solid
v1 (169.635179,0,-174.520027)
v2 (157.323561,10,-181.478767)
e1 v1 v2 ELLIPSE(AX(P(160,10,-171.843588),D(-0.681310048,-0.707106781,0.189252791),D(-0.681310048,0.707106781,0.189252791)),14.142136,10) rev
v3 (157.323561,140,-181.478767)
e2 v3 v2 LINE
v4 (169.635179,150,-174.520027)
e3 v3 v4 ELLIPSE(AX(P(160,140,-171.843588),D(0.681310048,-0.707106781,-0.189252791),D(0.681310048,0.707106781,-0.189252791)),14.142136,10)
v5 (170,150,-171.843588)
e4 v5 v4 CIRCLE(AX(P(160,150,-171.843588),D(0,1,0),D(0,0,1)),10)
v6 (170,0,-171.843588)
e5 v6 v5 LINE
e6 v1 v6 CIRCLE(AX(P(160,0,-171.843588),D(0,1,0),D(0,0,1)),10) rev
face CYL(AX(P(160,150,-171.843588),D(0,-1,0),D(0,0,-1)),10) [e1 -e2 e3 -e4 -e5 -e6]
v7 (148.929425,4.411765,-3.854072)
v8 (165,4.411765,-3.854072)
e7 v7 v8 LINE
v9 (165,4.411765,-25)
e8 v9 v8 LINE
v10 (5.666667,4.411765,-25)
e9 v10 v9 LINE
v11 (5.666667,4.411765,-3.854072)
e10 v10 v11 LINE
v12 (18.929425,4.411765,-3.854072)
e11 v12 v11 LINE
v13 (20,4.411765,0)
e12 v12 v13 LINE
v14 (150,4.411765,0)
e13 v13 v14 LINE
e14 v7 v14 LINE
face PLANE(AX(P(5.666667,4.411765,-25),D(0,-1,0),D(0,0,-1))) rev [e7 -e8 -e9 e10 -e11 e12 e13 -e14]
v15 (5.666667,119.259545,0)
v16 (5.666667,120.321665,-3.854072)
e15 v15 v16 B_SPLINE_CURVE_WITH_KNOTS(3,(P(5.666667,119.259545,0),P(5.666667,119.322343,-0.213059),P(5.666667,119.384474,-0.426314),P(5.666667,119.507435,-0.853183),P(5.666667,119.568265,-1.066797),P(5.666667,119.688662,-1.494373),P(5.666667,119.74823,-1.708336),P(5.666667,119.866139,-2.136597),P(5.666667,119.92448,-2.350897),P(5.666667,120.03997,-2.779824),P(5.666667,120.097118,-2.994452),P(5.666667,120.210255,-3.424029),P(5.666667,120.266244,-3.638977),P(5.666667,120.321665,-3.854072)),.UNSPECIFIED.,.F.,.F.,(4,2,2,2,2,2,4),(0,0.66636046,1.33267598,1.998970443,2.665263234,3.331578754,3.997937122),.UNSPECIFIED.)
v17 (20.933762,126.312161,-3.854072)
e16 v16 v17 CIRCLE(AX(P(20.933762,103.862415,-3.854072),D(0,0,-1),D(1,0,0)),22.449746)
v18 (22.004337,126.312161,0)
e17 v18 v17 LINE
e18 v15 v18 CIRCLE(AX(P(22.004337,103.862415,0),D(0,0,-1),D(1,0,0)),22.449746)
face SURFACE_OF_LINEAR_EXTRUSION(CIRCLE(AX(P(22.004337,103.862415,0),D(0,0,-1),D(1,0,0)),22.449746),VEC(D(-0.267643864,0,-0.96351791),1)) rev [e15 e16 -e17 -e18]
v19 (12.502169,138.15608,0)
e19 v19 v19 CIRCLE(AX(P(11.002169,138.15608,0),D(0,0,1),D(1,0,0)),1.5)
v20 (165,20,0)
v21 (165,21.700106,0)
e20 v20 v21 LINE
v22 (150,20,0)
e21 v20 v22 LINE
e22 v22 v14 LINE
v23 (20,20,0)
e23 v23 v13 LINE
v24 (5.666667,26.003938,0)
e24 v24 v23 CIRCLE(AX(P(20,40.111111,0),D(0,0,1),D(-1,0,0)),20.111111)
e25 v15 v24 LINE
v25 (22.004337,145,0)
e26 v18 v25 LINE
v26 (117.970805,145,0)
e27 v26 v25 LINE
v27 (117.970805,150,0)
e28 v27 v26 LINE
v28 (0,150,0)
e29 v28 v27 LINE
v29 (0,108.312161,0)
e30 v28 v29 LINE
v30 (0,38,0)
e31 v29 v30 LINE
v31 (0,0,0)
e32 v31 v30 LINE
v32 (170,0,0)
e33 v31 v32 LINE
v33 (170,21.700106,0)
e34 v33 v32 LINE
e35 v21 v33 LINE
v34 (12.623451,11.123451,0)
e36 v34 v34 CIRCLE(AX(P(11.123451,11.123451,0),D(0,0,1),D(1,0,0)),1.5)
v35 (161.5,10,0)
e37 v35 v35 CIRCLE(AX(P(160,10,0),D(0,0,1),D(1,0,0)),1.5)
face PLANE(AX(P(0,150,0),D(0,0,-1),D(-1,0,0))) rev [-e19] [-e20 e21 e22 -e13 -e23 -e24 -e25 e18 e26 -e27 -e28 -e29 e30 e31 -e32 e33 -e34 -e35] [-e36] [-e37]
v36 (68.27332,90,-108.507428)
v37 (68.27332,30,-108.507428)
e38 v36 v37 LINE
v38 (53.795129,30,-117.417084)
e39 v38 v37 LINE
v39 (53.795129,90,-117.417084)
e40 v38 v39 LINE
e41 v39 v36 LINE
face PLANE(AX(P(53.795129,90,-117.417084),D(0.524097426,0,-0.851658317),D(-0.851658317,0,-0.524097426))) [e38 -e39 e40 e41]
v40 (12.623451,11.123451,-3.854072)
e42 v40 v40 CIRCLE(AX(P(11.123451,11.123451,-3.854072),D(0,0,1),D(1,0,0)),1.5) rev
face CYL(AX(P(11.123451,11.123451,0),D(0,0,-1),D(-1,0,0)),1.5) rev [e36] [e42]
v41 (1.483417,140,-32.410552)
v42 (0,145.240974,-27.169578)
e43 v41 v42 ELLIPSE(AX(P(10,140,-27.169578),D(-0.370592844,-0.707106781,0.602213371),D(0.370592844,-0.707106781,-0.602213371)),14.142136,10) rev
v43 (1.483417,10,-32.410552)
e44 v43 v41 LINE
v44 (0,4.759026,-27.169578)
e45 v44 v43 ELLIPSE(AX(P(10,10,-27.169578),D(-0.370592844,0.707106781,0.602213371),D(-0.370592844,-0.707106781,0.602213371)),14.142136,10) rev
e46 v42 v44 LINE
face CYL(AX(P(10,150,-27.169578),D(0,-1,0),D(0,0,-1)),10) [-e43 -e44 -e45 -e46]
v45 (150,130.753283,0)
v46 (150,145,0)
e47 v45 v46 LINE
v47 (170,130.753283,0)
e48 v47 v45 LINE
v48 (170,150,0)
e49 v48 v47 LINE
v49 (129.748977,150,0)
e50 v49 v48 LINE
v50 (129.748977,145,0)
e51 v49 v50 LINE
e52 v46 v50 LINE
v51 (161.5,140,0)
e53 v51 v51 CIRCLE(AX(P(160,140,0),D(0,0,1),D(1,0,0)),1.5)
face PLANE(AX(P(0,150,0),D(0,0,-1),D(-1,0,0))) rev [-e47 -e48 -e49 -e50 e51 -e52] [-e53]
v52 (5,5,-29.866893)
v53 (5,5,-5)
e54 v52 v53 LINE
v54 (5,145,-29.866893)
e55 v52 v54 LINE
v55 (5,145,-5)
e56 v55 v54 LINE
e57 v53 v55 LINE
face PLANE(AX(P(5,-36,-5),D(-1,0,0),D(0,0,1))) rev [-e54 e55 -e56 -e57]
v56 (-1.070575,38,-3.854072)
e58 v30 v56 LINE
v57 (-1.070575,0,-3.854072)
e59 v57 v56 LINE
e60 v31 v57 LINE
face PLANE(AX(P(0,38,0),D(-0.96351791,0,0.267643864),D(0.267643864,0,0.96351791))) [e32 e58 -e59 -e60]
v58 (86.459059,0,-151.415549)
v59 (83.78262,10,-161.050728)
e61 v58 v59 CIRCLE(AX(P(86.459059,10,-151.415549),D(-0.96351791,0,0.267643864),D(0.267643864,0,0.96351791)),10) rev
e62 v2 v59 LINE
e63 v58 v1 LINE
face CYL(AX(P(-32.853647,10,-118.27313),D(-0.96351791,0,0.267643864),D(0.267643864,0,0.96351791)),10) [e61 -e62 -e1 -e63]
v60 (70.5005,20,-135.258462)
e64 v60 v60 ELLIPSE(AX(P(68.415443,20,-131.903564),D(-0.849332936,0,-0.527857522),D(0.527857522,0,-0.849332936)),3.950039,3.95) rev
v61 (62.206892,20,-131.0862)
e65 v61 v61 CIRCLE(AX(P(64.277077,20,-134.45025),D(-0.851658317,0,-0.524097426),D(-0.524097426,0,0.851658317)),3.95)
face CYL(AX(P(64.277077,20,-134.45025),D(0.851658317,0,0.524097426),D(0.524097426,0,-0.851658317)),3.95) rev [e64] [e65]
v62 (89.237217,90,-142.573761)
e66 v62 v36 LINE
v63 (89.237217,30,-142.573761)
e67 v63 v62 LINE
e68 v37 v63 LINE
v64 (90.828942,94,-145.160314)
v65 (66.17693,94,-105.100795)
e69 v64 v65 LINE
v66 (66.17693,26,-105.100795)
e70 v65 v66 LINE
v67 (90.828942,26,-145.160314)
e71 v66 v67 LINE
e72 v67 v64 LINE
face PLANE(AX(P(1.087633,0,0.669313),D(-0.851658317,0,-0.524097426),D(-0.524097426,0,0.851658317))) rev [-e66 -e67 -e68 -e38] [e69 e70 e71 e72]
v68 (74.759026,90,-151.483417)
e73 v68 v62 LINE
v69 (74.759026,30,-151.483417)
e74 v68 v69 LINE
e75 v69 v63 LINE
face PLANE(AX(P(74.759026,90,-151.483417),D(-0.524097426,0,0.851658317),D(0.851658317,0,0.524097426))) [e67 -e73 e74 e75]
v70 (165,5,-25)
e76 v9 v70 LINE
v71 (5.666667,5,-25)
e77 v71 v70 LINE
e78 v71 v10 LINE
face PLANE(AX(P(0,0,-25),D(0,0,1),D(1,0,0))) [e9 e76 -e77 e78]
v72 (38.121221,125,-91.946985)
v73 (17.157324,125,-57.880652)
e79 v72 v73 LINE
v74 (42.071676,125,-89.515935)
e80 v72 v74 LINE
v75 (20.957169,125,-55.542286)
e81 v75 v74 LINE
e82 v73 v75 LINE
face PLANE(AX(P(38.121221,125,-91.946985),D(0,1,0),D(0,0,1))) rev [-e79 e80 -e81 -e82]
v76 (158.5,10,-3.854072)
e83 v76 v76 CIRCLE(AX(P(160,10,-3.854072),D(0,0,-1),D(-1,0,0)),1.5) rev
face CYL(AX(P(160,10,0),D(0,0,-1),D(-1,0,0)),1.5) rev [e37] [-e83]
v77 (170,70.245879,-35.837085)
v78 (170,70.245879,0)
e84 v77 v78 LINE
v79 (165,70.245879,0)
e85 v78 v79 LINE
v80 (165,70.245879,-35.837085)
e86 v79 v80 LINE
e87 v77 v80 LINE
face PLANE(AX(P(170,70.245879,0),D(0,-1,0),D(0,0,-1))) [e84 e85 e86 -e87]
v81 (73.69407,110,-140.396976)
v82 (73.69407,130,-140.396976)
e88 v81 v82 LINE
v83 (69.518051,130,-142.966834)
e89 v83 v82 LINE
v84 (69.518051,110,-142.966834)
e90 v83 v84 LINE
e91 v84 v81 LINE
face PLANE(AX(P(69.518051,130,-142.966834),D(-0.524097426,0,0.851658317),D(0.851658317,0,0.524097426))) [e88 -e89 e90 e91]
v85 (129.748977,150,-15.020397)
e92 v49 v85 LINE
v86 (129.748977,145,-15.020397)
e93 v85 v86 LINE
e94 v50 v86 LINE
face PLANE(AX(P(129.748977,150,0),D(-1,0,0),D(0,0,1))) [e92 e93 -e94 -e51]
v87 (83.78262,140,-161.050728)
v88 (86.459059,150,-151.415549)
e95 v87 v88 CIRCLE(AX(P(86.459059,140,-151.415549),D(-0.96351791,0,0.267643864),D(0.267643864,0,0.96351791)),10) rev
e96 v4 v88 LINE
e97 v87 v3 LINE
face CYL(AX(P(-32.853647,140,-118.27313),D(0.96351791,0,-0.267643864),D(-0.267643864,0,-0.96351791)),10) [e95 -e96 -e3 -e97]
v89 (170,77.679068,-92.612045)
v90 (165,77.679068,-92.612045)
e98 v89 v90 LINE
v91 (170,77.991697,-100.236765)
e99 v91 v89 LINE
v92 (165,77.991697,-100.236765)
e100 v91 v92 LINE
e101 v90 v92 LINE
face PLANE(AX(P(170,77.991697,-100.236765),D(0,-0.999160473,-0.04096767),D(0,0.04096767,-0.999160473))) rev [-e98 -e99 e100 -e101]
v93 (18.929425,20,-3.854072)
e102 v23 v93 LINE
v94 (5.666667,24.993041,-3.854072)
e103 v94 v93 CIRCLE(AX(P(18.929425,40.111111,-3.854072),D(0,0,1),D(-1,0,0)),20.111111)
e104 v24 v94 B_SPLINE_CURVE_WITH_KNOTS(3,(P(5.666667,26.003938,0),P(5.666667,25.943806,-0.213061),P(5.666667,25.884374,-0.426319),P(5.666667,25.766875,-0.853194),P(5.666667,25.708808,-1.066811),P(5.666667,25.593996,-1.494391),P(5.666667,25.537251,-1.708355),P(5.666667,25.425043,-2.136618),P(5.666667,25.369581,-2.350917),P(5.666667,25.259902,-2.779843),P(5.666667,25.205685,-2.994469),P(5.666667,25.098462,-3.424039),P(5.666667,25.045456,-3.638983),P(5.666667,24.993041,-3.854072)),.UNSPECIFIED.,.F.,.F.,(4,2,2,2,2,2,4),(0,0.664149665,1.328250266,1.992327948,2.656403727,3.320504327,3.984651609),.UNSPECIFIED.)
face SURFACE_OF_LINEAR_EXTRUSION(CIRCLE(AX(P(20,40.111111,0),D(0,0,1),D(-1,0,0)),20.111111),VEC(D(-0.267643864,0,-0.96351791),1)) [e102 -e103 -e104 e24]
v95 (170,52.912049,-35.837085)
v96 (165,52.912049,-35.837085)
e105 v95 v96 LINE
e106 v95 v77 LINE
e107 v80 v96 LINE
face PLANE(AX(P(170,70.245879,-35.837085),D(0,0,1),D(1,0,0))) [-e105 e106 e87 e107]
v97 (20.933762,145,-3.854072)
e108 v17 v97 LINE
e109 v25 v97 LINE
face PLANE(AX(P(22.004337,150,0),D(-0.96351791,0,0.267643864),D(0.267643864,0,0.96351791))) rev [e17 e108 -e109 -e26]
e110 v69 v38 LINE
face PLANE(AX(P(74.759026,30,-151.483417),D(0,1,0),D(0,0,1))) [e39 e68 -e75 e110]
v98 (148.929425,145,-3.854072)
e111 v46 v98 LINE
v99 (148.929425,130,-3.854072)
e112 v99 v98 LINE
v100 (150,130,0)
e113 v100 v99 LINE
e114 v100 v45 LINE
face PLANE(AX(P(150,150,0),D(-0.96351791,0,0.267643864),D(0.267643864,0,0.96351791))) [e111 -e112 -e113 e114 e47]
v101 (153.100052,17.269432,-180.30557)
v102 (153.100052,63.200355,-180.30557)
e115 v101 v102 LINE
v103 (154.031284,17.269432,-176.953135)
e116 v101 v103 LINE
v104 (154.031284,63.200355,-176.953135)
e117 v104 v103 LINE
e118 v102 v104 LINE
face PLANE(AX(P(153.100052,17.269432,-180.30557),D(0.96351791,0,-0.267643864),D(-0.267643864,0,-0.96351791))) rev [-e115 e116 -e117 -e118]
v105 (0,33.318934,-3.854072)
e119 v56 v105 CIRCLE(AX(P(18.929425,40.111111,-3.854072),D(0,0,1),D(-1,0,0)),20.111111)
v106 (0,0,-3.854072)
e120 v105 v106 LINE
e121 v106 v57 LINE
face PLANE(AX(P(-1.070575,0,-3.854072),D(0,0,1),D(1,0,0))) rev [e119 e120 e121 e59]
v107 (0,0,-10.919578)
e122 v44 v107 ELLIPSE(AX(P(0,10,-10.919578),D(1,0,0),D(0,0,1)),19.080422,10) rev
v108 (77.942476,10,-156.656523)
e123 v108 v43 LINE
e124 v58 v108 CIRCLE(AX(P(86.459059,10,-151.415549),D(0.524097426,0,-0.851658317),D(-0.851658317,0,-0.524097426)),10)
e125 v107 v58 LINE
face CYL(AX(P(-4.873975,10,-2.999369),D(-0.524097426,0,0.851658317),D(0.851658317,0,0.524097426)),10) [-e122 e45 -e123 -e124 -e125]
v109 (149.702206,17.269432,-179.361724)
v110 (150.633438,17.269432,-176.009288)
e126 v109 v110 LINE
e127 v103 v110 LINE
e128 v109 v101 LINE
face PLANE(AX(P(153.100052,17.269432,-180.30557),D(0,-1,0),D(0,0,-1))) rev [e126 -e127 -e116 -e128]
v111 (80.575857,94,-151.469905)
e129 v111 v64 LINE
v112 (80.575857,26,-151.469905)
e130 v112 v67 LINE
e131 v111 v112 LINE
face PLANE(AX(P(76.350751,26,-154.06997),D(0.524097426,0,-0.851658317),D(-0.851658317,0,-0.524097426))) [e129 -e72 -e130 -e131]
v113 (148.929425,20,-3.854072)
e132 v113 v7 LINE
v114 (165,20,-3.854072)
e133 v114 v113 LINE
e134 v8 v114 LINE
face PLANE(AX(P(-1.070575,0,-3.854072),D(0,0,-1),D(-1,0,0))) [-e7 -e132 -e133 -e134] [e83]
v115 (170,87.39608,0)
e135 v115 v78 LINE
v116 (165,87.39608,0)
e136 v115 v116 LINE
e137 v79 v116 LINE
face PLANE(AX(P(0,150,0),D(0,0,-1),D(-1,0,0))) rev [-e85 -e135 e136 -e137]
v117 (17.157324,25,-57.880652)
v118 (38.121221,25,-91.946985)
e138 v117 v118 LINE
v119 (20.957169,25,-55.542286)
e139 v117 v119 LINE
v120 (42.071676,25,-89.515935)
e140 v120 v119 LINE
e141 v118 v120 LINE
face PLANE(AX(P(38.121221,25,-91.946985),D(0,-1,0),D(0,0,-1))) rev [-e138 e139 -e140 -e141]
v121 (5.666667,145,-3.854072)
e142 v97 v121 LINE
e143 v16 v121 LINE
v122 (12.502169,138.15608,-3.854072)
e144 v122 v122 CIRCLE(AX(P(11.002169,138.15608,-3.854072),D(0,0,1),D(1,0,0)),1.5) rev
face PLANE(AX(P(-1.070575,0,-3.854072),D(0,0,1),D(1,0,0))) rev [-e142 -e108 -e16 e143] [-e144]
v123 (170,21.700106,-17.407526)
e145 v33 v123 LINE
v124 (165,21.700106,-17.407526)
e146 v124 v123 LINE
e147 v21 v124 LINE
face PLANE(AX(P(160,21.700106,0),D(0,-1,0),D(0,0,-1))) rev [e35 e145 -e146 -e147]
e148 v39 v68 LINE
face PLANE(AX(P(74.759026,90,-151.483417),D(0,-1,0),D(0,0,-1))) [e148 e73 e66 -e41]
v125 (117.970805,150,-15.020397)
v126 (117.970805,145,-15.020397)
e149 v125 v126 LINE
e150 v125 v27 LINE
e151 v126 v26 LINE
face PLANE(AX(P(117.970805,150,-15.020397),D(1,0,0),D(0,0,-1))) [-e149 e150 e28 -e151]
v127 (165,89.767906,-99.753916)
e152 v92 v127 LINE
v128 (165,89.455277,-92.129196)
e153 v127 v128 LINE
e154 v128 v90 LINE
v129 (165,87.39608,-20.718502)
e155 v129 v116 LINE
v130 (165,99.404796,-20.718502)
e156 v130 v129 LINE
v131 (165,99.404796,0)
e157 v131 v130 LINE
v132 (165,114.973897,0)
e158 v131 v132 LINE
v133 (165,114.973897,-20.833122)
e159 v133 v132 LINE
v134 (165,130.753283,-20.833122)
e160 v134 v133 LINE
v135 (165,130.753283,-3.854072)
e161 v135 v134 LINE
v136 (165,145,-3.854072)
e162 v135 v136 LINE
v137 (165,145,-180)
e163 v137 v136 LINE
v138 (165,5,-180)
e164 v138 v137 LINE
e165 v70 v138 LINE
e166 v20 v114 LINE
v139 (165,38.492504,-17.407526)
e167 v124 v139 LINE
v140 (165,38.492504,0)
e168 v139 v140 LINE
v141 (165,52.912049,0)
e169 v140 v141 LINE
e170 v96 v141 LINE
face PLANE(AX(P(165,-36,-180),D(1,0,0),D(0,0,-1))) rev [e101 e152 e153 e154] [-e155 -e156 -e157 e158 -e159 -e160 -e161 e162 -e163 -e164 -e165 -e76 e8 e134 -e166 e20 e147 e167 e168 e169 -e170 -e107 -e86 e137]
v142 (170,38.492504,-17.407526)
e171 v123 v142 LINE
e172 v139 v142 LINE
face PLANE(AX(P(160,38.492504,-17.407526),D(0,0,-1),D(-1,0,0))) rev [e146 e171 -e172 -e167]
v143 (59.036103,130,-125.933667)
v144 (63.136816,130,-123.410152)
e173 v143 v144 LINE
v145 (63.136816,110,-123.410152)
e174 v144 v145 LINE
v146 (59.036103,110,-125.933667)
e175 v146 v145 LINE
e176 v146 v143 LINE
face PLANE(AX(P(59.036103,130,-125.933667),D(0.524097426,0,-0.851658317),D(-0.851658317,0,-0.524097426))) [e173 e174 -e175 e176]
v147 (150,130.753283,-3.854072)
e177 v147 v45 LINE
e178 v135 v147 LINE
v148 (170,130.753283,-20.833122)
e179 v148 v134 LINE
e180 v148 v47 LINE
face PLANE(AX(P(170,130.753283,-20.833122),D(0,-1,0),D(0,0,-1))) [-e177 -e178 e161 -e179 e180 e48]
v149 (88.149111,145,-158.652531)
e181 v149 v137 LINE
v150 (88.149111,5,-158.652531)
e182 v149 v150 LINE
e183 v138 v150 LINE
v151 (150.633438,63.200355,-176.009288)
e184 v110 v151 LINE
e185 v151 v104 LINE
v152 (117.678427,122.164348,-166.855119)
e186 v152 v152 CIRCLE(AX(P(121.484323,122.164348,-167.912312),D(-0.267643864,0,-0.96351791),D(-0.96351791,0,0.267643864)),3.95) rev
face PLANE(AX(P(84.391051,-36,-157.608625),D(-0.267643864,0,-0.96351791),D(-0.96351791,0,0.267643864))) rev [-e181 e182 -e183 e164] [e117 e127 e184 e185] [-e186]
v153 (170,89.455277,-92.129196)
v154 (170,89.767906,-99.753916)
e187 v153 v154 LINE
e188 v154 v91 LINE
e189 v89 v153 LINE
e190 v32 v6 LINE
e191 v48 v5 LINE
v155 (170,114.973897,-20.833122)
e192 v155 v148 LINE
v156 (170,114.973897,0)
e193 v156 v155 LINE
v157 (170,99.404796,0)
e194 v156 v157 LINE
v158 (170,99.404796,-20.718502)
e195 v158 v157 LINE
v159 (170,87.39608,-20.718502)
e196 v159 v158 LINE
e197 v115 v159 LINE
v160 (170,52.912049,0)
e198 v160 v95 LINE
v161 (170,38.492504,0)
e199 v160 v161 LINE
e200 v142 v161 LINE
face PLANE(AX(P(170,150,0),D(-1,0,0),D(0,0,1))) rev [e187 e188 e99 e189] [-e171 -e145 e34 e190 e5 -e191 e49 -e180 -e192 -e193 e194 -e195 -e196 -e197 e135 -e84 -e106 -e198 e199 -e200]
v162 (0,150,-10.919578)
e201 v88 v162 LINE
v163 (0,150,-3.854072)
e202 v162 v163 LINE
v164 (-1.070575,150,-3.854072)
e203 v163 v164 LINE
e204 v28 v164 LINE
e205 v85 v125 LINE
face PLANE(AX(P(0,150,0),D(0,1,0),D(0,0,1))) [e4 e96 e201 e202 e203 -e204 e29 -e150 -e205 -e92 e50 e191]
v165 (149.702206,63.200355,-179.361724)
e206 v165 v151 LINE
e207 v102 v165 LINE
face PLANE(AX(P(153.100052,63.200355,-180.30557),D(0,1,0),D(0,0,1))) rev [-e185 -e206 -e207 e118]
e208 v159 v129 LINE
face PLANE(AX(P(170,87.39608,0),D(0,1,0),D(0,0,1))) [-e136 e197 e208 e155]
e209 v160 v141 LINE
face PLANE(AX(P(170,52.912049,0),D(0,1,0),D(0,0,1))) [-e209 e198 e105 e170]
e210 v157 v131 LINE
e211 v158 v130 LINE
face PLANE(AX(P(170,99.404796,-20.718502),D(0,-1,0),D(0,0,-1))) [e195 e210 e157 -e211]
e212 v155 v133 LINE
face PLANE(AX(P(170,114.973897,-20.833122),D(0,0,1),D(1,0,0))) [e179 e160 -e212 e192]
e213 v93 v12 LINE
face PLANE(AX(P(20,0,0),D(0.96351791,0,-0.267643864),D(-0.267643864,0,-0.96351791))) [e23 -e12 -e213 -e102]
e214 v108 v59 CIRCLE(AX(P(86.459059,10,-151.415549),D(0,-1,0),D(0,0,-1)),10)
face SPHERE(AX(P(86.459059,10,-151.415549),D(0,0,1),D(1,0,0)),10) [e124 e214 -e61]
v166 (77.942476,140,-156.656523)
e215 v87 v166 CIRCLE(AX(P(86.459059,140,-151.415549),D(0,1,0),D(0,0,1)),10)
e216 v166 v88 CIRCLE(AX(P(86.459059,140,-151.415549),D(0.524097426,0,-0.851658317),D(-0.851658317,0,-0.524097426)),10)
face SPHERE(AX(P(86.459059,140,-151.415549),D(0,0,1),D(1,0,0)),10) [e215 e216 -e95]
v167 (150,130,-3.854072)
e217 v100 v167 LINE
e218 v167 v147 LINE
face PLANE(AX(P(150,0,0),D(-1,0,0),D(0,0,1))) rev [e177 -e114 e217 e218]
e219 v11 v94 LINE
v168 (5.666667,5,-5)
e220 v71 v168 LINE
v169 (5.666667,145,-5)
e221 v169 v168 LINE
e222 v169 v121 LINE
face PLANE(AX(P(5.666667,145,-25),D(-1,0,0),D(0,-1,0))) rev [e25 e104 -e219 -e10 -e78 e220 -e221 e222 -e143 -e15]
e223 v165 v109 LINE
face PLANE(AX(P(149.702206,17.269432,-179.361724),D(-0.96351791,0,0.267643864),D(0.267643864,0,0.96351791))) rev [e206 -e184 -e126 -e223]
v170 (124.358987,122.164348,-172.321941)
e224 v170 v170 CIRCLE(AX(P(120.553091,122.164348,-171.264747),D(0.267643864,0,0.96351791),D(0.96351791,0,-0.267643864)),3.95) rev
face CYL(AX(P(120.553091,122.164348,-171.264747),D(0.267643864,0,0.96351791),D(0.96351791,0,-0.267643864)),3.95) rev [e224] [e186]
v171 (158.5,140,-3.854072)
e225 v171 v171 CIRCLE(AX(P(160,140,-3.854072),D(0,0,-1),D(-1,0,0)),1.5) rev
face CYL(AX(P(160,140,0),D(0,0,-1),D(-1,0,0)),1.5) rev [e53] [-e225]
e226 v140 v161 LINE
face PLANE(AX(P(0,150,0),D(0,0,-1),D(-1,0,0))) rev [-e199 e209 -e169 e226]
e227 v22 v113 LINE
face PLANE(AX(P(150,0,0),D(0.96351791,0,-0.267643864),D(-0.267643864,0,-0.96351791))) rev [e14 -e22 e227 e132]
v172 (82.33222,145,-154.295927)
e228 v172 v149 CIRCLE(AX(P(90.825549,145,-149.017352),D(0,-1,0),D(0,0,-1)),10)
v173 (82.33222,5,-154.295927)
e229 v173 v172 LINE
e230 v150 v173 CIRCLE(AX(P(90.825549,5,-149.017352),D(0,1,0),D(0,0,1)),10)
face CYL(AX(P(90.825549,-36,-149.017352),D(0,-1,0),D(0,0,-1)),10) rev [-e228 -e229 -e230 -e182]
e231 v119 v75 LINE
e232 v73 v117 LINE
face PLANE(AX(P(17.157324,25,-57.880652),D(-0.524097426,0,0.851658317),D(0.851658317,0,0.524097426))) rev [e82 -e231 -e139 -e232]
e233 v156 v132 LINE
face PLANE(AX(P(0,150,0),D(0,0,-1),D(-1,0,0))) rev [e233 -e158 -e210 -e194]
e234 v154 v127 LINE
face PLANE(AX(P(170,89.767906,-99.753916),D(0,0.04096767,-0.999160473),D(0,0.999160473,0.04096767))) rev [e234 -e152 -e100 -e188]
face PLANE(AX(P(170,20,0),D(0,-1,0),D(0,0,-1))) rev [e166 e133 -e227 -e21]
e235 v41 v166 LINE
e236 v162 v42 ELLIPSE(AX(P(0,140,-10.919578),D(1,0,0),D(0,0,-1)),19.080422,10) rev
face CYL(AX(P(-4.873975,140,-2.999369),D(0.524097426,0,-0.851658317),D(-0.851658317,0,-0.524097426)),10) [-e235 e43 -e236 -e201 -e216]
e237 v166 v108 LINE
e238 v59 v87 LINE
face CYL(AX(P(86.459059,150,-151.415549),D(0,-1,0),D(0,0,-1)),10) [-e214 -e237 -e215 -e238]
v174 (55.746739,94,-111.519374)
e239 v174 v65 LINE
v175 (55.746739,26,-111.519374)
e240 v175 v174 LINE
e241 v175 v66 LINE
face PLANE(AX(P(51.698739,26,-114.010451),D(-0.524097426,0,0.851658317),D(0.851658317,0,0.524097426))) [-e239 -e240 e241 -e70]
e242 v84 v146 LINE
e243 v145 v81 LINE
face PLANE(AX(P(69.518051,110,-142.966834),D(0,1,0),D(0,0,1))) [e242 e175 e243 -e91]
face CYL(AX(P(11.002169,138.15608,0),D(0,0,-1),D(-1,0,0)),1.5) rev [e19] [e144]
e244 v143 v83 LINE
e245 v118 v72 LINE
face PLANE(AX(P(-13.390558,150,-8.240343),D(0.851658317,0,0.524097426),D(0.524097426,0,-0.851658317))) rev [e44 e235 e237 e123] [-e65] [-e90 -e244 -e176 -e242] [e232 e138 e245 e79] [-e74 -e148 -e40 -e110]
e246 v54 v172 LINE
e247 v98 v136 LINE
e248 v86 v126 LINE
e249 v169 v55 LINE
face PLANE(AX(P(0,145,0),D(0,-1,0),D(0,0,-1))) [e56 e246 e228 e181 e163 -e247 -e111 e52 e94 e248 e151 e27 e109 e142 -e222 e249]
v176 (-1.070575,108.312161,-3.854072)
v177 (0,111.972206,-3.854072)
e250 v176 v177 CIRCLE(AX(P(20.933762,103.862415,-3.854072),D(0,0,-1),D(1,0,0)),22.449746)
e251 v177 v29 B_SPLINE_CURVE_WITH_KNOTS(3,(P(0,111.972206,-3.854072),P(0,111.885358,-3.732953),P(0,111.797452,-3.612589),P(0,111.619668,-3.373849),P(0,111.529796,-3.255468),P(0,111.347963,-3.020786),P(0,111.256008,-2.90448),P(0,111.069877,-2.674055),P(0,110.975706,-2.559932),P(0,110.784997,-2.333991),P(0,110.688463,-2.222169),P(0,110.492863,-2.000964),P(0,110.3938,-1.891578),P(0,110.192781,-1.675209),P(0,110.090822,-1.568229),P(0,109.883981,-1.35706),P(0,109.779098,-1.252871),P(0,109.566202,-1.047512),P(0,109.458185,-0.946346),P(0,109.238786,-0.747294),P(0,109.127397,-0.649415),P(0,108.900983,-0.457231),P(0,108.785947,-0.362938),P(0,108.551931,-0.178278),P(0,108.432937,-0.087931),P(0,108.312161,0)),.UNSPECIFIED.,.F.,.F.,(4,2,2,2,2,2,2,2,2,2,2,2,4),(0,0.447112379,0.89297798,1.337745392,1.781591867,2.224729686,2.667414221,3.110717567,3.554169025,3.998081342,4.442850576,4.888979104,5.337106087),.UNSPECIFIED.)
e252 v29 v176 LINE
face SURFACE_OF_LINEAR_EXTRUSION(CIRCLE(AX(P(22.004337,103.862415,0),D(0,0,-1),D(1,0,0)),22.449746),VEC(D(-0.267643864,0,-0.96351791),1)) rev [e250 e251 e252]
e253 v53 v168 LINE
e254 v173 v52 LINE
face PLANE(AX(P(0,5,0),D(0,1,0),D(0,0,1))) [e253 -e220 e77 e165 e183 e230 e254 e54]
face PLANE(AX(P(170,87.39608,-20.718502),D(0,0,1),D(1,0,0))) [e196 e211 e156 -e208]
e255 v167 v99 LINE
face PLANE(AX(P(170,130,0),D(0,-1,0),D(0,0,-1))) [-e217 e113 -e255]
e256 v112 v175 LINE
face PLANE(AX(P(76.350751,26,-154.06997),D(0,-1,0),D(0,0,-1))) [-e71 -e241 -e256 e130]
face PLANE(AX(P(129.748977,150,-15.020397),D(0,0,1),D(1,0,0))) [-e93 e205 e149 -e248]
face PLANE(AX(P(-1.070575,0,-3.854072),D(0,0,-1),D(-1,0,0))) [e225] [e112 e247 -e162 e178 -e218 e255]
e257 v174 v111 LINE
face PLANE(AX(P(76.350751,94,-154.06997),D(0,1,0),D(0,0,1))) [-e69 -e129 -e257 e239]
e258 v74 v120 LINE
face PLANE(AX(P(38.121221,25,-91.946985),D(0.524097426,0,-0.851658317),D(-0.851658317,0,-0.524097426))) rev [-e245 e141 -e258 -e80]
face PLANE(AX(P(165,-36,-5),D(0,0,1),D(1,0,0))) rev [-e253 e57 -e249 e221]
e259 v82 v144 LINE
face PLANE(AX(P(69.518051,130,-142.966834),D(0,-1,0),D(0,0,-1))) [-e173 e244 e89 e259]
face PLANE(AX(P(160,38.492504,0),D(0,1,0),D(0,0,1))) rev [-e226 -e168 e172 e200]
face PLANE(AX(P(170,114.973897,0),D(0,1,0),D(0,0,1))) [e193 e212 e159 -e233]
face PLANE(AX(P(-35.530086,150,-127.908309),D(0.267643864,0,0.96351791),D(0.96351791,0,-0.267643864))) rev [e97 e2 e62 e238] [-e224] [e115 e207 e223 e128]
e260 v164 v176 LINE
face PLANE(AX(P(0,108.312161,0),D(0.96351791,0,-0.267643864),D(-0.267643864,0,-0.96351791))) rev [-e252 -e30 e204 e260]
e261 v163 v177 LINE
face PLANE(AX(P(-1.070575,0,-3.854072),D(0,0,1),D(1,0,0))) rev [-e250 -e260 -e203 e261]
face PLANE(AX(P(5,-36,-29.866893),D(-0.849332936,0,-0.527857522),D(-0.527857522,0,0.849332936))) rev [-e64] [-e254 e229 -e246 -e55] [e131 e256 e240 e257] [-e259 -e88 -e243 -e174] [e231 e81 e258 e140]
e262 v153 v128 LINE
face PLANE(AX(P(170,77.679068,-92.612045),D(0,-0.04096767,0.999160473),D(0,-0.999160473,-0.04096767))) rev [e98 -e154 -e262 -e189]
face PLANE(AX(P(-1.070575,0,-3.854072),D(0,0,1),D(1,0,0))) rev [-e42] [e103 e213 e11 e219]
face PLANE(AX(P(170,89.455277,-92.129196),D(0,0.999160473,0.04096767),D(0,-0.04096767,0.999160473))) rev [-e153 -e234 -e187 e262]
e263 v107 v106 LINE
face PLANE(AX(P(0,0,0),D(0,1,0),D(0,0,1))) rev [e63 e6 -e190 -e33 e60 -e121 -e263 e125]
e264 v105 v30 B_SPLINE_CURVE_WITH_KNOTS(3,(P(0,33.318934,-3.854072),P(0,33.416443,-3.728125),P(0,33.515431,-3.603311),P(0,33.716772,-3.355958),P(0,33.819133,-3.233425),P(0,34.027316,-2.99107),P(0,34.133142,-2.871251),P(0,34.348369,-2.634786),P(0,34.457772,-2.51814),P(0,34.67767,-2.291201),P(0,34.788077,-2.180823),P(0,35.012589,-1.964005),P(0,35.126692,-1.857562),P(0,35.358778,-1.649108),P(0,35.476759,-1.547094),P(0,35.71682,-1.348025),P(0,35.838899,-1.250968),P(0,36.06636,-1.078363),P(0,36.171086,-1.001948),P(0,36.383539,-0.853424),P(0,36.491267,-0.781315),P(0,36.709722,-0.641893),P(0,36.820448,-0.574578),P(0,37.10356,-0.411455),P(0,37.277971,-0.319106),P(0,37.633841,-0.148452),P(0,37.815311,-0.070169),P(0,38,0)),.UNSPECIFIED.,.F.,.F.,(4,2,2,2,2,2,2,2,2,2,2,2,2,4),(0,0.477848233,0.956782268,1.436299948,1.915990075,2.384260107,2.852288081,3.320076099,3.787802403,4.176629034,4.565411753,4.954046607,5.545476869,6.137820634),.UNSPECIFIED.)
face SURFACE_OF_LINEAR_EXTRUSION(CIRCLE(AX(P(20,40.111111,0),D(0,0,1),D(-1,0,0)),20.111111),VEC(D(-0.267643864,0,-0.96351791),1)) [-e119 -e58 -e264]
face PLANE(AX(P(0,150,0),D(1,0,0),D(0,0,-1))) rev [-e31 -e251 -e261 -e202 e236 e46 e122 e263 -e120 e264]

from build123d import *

# Parameters (mm, degrees)
ESBO_O1_W                  = 170
ESBO_O1_H                  = 30
RESSALTO_EXTRUS_O1_DEPTH   = 150
CORTE_EXTRUS_O1_DEPTH      = 222
CORTE_EXTRUS_O1_DEPTH_BACK = 36
RESSALTO_EXTRUS_O2_DEPTH   = 5
RESSALTO_EXTRUS_O3_DEPTH   = 5
ESBO_O4_W                  = 159.333333333
ESBO_O4_H                  = 140.588235294
CORTE_EXTRUS_O2_DEPTH      = 25
CORTE_EXTRUS_O3_DEPTH      = 31
CORTE_EXTRUS_O4_DEPTH      = 42
FILETE1_R                  = 10
CORTE_EXTRUS_O5_DEPTH      = 32
CORTE_EXTRUS_O6_START      = -15.72292277
CORTE_EXTRUS_O6_OUTLINE_R  = 3.95
CORTE_EXTRUS_O6_DEPTH      = 4.876648775
CORTE_EXTRUS_O7_START      = -132.751356438
CORTE_EXTRUS_O7_OUTLINE_R  = 3.95
CORTE_EXTRUS_O7_DEPTH      = 3.479370229
RESSALTO_EXTRUS_O6_DEPTH   = 17
RESSALTO_EXTRUS_O7_DEPTH   = 4
CORTE_EXTRUS_O8_DEPTH      = 21
F_3DSKETCH12_R             = 1.5
CORTE_EXTRUS_O9_DEPTH      = 14
CORTE_EXTRUS_O10_DEPTH     = 19
ESBO_O11_W                 = 17.407525744
ESBO_O11_H                 = 16.792397695
CORTE_EXTRUS_O11_DEPTH     = 10
CORTE_EXTRUS_O12_DEPTH     = 20
CORTE_EXTRUS_O13_DEPTH     = 14


# Read off the part's stored shape, not the designer's step: Corte-extrusão6, Corte-extrusão7
with BuildPart() as part:
    # Esboço1 → Ressalto-extrusão1 (new body)
    with BuildSketch(Plane(origin=(0, 0, 0), x_dir=(1, 0, 0), z_dir=(0, 1, 0))):
        with Locations((85, 15)):
            Rectangle(ESBO_O1_W, ESBO_O1_H)
        Polygon((80, 160), (0, 30), (170, 30), (170, 160), align=None)
        Polygon((170, 160), (170, 185), (80, 160), align=None)
    extrude(amount=RESSALTO_EXTRUS_O1_DEPTH)

    # Esboço2 → Corte-extrusão1 (cut, two sides: drawn at the far end of the back side and taken through both)
    with BuildSketch(Plane(origin=(0, 0, 0), x_dir=(1, 0, 0), z_dir=(0, 1, 0)).offset(-CORTE_EXTRUS_O1_DEPTH_BACK)):
        Polygon((84.391050739, 157.608625205), (165, 180), (165, 5), (5, 5), (5, 29.866892941), align=None)
    extrude(amount=CORTE_EXTRUS_O1_DEPTH + CORTE_EXTRUS_O1_DEPTH_BACK, mode=Mode.SUBTRACT)

    # Esboço3 → Ressalto-extrusão2 (add)
    with BuildSketch(Plane(origin=(0, 0, 0), x_dir=(1, 0, 0), z_dir=(0, 1, 0))):
        Polygon((84.391050739, 157.608625205), (165, 180), (165, 5), (5, 5), (5, 29.866892941), align=None)
    extrude(amount=RESSALTO_EXTRUS_O2_DEPTH)

    # 3DSketch2 → Ressalto-extrusão3 (add)
    with BuildSketch(Plane(origin=(165, 150, -5), x_dir=(0, 0, -1), z_dir=(0, 1, 0))):
        Polygon((0, 0), (0, 160), (24.866892941, 160), (152.608625205, 80.608949261), (175, 0), align=None)
    extrude(amount=-RESSALTO_EXTRUS_O3_DEPTH)

    # Esboço4 → Corte-extrusão2 (cut)
    with BuildSketch(Plane.XY):
        with Locations((85.333333333, 74.705882353)):
            Rectangle(ESBO_O4_W, ESBO_O4_H)
    extrude(amount=-CORTE_EXTRUS_O2_DEPTH, mode=Mode.SUBTRACT)

    # 3DSketch3 → Corte-extrusão3 (cut)
    with BuildSketch(Plane(origin=(74.759025743, 90, -151.483416833), x_dir=(-0.29071694485714406, -0.8320502943378435, 0.4724150353928592), z_dir=(-0.8516583167045438, 0, -0.5240974256643346))):
        Polygon((0, 0), (22.188007849, 33.282011774), (72.111025509, 0), (49.92301766, -33.282011774), align=None)
    extrude(amount=-CORTE_EXTRUS_O3_DEPTH, mode=Mode.SUBTRACT)

    # 3DSketch4 → Corte-extrusão4 (cut)
    with BuildSketch(Plane(origin=(69.518051487, 130, -142.966833666), x_dir=(-0.37059284368967266, -0.7071067811865471, 0.6022133709956982), z_dir=(0.8516583167045362, 0, 0.5240974256643472))):
        Polygon((0, 0), (14.142135624, -14.142135624), (28.284271247, 0), (14.142135624, 14.142135624), align=None)
    extrude(amount=CORTE_EXTRUS_O4_DEPTH, mode=Mode.SUBTRACT)

    # Filete1
    filete1_edges = [part.edges().sort_by_distance(p)[0] for p in [
        (170, 75, -185),
        (125, 0, -172.5),
        (125, 150, -172.5),
        (80, 75, -160),
        (40, 0, -95),
        (40, 150, -95),
        (0, 75, -30),
        (84.391050739, 75, -157.608625205),
    ]]
    fillet(filete1_edges, radius=FILETE1_R)

    # 3DSketch5 → Corte-extrusão5 (cut)
    with BuildSketch(Plane(origin=(38.121221288, 25, -91.946984593), x_dir=(-0.194644897392922, 0.9284766908852593, 0.31629795826349816), z_dir=(0.851658316704544, 0, 0.5240974256643347))):
        Polygon((0, 0), (14.855627054, 37.139067635), (107.703296143, 0), (92.847669089, -37.139067635), align=None)
    extrude(amount=CORTE_EXTRUS_O5_DEPTH, mode=Mode.SUBTRACT)

    # Corte-extrusão6 outline → Corte-extrusão6 (cut)
    with BuildSketch(Plane(origin=(0, 0, 0), x_dir=(0.5240974256643349, 0, -0.8516583167045437), z_dir=(0.8516583167045437, 0, 0.5240974256643349)).offset(CORTE_EXTRUS_O6_START)):
        with Locations((148.193124726, 20)):
            Circle(CORTE_EXTRUS_O6_OUTLINE_R)
    extrude(amount=CORTE_EXTRUS_O6_DEPTH, mode=Mode.SUBTRACT)

    # Corte-extrusão7 outline → Corte-extrusão7 (cut)
    with BuildSketch(Plane(origin=(0, 0, 0), x_dir=(0.9635179096299408, 0, -0.267643863786094), z_dir=(0.267643863786094, 0, 0.9635179096299409)).offset(CORTE_EXTRUS_O7_START)):
        with Locations((161.993020775, 122.164347625)):
            Circle(CORTE_EXTRUS_O7_OUTLINE_R)
    extrude(amount=CORTE_EXTRUS_O7_DEPTH, mode=Mode.SUBTRACT)

    # 3DSketch9 → Ressalto-extrusão6 (add)
    with BuildSketch(Plane(origin=(76.350750718, 26, -154.069969916), x_dir=(-0.29815073011621673, 0.8224176546598938, 0.4844949364388514), z_dir=(0.8516583167045438, 0, 0.5240974256643349))):
        Polygon((0, 0), (26.758649409, 38.684123705), (82.683049926, 0), (55.924400517, -38.684123705), align=None)
        Polygon((5.017416454, 0.222210211), (27.772783339, 33.118916398), (77.117842619, -1.01413393), (54.362475733, -33.910840117), align=None, mode=Mode.SUBTRACT)
    extrude(amount=RESSALTO_EXTRUS_O6_DEPTH)

    # 3DSketch10 → Ressalto-extrusão7 (add, along a direction that is not the sketch's normal)
    with BuildSketch(Plane(origin=(0, 0, 0), x_dir=(0.7498378553650926, 0.6616216370868463, 0), z_dir=(0, 0, 1))):
        with BuildLine():
            Line((0, 0), (14.996757107, -13.232432742))
            Line((14.996757107, -13.232432742), (28.229189849, 1.764324366))
            ThreePointArc((28.229189849, 1.764324366), (21.556867541, 14.536675999), (25.141622209, 28.493838504))
            Line((25.141622209, 28.493838504), (13.232432742, 14.996757107))
            Line((13.232432742, 14.996757107), (0, 0))
        make_face()
        with BuildLine():
            Line((99.243245563, 112.475678305), (115.742930564, 97.917132715))
            Line((115.742930564, 97.917132715), (100.070543679, 80.155094246))
            ThreePointArc((100.070543679, 80.155094246), (86.055529464, 85.755516688), (71.66166921, 81.216558438))
            Line((71.66166921, 81.216558438), (83.570858678, 94.713639835))
            Line((83.570858678, 94.713639835), (99.243245563, 112.475678305))
        make_face()
        Polygon((226.715680975, 0), (211.718923868, 13.232432742), (198.486491126, -1.764324366), (213.483248233, -14.996757107), align=None)
        Polygon((127.472435412, -112.475678305), (112.475678305, -99.243245563), (125.708111047, -84.246488456), (140.704868154, -97.478921197), align=None)
    extrude(amount=-RESSALTO_EXTRUS_O7_DEPTH, dir=(0.26764386378609445, 0, 0.9635179096299407))

    # 3DSketch11 → Corte-extrusão8 (cut)
    with BuildSketch(Plane(origin=(153.100052242, 17.26943239, -180.305570067), x_dir=(-0.07376023038027929, 0.9970655099962036, 0.02048895288341091), z_dir=(0.2676438637860946, 0, 0.9635179096299407))):
        Polygon((0, 0), (0.269964353, 3.516152018), (46.066103253, 0), (45.7961389, -3.516152018), align=None)
    extrude(amount=CORTE_EXTRUS_O8_DEPTH, mode=Mode.SUBTRACT)

    # 3DSketch12 → Corte-extrusão9 (cut)
    with BuildSketch(Plane(origin=(160, 140, 0), x_dir=(-0.7560654573770964, -0.6544960077503622, 0), z_dir=(0, 0, 1))):
        with Locations(Location((0, 0, 0), (0, 0, 319.118554366))):
            Circle(F_3DSKETCH12_R)
        with Locations(Location((85.084481008, 98.288509459, 0), (0, 0, 319.118554366))):
            Circle(F_3DSKETCH12_R)
        with Locations(Location((113.858951537, -96.124361942, 0), (0, 0, 139.118554366))):
            Circle(F_3DSKETCH12_R)
        with Locations(Location((196.909602971, 0, 0), (0, 0, 139.118554366))):
            Circle(F_3DSKETCH12_R)
    extrude(amount=-CORTE_EXTRUS_O9_DEPTH, mode=Mode.SUBTRACT)

    # 3DSketch13 → Corte-extrusão10 (cut)
    with BuildSketch(Plane(origin=(170, 70.245878967, 0), x_dir=(0, -0.4354246522459521, -0.9002251786172678), z_dir=(-1, 0, 0))):
        Polygon((0, 0), (32.261446294, -15.604350297), (39.809023237, 0), (7.547576943, 15.604350297), align=None)
    extrude(amount=CORTE_EXTRUS_O10_DEPTH, mode=Mode.SUBTRACT)

    # Esboço11 → Corte-extrusão11 (cut)
    with BuildSketch(Plane(origin=(170, 0, 0), x_dir=(0, 0, -1), z_dir=(1, 0, 0))):
        with Locations((8.703762872, 30.096304842)):
            Rectangle(ESBO_O11_W, ESBO_O11_H)
    extrude(amount=-CORTE_EXTRUS_O11_DEPTH, mode=Mode.SUBTRACT)

    # 3DSketch14 → Corte-extrusão12 (cut)
    with BuildSketch(Plane(origin=(170, 87.396079578, 0), x_dir=(0, -0.09341146144778735, -0.9956275904524686), z_dir=(1, 0, 0))):
        Polygon((0, 0), (20.627912038, 1.935345533), (19.506160301, 13.891554783), (-1.121751737, 11.956209249), align=None)
        Polygon((-2.576084268, 27.457236328), (18.165947056, 29.403288726), (16.691971594, 45.113680317), (-4.050059731, 43.167627919), align=None)
        Polygon((91.534016736, 10.656116635), (99.096194716, 11.679615344), (100.676965661, 0), (93.114787682, -1.02349871), align=None)
    extrude(amount=-CORTE_EXTRUS_O12_DEPTH, mode=Mode.SUBTRACT)

    # 3DSketch15 → Corte-extrusão13 (cut)
    with BuildSketch(Plane(origin=(129.748977416, 150, 0), x_dir=(-0.6170578351280018, 0, -0.7869178026370631), z_dir=(0, -1, 0))):
        Polygon((0, 0), (11.819817446, 9.268453377), (19.087630878, 0), (7.267813432, -9.268453377), align=None)
    extrude(amount=CORTE_EXTRUS_O13_DEPTH, mode=Mode.SUBTRACT)


solid = part.part
